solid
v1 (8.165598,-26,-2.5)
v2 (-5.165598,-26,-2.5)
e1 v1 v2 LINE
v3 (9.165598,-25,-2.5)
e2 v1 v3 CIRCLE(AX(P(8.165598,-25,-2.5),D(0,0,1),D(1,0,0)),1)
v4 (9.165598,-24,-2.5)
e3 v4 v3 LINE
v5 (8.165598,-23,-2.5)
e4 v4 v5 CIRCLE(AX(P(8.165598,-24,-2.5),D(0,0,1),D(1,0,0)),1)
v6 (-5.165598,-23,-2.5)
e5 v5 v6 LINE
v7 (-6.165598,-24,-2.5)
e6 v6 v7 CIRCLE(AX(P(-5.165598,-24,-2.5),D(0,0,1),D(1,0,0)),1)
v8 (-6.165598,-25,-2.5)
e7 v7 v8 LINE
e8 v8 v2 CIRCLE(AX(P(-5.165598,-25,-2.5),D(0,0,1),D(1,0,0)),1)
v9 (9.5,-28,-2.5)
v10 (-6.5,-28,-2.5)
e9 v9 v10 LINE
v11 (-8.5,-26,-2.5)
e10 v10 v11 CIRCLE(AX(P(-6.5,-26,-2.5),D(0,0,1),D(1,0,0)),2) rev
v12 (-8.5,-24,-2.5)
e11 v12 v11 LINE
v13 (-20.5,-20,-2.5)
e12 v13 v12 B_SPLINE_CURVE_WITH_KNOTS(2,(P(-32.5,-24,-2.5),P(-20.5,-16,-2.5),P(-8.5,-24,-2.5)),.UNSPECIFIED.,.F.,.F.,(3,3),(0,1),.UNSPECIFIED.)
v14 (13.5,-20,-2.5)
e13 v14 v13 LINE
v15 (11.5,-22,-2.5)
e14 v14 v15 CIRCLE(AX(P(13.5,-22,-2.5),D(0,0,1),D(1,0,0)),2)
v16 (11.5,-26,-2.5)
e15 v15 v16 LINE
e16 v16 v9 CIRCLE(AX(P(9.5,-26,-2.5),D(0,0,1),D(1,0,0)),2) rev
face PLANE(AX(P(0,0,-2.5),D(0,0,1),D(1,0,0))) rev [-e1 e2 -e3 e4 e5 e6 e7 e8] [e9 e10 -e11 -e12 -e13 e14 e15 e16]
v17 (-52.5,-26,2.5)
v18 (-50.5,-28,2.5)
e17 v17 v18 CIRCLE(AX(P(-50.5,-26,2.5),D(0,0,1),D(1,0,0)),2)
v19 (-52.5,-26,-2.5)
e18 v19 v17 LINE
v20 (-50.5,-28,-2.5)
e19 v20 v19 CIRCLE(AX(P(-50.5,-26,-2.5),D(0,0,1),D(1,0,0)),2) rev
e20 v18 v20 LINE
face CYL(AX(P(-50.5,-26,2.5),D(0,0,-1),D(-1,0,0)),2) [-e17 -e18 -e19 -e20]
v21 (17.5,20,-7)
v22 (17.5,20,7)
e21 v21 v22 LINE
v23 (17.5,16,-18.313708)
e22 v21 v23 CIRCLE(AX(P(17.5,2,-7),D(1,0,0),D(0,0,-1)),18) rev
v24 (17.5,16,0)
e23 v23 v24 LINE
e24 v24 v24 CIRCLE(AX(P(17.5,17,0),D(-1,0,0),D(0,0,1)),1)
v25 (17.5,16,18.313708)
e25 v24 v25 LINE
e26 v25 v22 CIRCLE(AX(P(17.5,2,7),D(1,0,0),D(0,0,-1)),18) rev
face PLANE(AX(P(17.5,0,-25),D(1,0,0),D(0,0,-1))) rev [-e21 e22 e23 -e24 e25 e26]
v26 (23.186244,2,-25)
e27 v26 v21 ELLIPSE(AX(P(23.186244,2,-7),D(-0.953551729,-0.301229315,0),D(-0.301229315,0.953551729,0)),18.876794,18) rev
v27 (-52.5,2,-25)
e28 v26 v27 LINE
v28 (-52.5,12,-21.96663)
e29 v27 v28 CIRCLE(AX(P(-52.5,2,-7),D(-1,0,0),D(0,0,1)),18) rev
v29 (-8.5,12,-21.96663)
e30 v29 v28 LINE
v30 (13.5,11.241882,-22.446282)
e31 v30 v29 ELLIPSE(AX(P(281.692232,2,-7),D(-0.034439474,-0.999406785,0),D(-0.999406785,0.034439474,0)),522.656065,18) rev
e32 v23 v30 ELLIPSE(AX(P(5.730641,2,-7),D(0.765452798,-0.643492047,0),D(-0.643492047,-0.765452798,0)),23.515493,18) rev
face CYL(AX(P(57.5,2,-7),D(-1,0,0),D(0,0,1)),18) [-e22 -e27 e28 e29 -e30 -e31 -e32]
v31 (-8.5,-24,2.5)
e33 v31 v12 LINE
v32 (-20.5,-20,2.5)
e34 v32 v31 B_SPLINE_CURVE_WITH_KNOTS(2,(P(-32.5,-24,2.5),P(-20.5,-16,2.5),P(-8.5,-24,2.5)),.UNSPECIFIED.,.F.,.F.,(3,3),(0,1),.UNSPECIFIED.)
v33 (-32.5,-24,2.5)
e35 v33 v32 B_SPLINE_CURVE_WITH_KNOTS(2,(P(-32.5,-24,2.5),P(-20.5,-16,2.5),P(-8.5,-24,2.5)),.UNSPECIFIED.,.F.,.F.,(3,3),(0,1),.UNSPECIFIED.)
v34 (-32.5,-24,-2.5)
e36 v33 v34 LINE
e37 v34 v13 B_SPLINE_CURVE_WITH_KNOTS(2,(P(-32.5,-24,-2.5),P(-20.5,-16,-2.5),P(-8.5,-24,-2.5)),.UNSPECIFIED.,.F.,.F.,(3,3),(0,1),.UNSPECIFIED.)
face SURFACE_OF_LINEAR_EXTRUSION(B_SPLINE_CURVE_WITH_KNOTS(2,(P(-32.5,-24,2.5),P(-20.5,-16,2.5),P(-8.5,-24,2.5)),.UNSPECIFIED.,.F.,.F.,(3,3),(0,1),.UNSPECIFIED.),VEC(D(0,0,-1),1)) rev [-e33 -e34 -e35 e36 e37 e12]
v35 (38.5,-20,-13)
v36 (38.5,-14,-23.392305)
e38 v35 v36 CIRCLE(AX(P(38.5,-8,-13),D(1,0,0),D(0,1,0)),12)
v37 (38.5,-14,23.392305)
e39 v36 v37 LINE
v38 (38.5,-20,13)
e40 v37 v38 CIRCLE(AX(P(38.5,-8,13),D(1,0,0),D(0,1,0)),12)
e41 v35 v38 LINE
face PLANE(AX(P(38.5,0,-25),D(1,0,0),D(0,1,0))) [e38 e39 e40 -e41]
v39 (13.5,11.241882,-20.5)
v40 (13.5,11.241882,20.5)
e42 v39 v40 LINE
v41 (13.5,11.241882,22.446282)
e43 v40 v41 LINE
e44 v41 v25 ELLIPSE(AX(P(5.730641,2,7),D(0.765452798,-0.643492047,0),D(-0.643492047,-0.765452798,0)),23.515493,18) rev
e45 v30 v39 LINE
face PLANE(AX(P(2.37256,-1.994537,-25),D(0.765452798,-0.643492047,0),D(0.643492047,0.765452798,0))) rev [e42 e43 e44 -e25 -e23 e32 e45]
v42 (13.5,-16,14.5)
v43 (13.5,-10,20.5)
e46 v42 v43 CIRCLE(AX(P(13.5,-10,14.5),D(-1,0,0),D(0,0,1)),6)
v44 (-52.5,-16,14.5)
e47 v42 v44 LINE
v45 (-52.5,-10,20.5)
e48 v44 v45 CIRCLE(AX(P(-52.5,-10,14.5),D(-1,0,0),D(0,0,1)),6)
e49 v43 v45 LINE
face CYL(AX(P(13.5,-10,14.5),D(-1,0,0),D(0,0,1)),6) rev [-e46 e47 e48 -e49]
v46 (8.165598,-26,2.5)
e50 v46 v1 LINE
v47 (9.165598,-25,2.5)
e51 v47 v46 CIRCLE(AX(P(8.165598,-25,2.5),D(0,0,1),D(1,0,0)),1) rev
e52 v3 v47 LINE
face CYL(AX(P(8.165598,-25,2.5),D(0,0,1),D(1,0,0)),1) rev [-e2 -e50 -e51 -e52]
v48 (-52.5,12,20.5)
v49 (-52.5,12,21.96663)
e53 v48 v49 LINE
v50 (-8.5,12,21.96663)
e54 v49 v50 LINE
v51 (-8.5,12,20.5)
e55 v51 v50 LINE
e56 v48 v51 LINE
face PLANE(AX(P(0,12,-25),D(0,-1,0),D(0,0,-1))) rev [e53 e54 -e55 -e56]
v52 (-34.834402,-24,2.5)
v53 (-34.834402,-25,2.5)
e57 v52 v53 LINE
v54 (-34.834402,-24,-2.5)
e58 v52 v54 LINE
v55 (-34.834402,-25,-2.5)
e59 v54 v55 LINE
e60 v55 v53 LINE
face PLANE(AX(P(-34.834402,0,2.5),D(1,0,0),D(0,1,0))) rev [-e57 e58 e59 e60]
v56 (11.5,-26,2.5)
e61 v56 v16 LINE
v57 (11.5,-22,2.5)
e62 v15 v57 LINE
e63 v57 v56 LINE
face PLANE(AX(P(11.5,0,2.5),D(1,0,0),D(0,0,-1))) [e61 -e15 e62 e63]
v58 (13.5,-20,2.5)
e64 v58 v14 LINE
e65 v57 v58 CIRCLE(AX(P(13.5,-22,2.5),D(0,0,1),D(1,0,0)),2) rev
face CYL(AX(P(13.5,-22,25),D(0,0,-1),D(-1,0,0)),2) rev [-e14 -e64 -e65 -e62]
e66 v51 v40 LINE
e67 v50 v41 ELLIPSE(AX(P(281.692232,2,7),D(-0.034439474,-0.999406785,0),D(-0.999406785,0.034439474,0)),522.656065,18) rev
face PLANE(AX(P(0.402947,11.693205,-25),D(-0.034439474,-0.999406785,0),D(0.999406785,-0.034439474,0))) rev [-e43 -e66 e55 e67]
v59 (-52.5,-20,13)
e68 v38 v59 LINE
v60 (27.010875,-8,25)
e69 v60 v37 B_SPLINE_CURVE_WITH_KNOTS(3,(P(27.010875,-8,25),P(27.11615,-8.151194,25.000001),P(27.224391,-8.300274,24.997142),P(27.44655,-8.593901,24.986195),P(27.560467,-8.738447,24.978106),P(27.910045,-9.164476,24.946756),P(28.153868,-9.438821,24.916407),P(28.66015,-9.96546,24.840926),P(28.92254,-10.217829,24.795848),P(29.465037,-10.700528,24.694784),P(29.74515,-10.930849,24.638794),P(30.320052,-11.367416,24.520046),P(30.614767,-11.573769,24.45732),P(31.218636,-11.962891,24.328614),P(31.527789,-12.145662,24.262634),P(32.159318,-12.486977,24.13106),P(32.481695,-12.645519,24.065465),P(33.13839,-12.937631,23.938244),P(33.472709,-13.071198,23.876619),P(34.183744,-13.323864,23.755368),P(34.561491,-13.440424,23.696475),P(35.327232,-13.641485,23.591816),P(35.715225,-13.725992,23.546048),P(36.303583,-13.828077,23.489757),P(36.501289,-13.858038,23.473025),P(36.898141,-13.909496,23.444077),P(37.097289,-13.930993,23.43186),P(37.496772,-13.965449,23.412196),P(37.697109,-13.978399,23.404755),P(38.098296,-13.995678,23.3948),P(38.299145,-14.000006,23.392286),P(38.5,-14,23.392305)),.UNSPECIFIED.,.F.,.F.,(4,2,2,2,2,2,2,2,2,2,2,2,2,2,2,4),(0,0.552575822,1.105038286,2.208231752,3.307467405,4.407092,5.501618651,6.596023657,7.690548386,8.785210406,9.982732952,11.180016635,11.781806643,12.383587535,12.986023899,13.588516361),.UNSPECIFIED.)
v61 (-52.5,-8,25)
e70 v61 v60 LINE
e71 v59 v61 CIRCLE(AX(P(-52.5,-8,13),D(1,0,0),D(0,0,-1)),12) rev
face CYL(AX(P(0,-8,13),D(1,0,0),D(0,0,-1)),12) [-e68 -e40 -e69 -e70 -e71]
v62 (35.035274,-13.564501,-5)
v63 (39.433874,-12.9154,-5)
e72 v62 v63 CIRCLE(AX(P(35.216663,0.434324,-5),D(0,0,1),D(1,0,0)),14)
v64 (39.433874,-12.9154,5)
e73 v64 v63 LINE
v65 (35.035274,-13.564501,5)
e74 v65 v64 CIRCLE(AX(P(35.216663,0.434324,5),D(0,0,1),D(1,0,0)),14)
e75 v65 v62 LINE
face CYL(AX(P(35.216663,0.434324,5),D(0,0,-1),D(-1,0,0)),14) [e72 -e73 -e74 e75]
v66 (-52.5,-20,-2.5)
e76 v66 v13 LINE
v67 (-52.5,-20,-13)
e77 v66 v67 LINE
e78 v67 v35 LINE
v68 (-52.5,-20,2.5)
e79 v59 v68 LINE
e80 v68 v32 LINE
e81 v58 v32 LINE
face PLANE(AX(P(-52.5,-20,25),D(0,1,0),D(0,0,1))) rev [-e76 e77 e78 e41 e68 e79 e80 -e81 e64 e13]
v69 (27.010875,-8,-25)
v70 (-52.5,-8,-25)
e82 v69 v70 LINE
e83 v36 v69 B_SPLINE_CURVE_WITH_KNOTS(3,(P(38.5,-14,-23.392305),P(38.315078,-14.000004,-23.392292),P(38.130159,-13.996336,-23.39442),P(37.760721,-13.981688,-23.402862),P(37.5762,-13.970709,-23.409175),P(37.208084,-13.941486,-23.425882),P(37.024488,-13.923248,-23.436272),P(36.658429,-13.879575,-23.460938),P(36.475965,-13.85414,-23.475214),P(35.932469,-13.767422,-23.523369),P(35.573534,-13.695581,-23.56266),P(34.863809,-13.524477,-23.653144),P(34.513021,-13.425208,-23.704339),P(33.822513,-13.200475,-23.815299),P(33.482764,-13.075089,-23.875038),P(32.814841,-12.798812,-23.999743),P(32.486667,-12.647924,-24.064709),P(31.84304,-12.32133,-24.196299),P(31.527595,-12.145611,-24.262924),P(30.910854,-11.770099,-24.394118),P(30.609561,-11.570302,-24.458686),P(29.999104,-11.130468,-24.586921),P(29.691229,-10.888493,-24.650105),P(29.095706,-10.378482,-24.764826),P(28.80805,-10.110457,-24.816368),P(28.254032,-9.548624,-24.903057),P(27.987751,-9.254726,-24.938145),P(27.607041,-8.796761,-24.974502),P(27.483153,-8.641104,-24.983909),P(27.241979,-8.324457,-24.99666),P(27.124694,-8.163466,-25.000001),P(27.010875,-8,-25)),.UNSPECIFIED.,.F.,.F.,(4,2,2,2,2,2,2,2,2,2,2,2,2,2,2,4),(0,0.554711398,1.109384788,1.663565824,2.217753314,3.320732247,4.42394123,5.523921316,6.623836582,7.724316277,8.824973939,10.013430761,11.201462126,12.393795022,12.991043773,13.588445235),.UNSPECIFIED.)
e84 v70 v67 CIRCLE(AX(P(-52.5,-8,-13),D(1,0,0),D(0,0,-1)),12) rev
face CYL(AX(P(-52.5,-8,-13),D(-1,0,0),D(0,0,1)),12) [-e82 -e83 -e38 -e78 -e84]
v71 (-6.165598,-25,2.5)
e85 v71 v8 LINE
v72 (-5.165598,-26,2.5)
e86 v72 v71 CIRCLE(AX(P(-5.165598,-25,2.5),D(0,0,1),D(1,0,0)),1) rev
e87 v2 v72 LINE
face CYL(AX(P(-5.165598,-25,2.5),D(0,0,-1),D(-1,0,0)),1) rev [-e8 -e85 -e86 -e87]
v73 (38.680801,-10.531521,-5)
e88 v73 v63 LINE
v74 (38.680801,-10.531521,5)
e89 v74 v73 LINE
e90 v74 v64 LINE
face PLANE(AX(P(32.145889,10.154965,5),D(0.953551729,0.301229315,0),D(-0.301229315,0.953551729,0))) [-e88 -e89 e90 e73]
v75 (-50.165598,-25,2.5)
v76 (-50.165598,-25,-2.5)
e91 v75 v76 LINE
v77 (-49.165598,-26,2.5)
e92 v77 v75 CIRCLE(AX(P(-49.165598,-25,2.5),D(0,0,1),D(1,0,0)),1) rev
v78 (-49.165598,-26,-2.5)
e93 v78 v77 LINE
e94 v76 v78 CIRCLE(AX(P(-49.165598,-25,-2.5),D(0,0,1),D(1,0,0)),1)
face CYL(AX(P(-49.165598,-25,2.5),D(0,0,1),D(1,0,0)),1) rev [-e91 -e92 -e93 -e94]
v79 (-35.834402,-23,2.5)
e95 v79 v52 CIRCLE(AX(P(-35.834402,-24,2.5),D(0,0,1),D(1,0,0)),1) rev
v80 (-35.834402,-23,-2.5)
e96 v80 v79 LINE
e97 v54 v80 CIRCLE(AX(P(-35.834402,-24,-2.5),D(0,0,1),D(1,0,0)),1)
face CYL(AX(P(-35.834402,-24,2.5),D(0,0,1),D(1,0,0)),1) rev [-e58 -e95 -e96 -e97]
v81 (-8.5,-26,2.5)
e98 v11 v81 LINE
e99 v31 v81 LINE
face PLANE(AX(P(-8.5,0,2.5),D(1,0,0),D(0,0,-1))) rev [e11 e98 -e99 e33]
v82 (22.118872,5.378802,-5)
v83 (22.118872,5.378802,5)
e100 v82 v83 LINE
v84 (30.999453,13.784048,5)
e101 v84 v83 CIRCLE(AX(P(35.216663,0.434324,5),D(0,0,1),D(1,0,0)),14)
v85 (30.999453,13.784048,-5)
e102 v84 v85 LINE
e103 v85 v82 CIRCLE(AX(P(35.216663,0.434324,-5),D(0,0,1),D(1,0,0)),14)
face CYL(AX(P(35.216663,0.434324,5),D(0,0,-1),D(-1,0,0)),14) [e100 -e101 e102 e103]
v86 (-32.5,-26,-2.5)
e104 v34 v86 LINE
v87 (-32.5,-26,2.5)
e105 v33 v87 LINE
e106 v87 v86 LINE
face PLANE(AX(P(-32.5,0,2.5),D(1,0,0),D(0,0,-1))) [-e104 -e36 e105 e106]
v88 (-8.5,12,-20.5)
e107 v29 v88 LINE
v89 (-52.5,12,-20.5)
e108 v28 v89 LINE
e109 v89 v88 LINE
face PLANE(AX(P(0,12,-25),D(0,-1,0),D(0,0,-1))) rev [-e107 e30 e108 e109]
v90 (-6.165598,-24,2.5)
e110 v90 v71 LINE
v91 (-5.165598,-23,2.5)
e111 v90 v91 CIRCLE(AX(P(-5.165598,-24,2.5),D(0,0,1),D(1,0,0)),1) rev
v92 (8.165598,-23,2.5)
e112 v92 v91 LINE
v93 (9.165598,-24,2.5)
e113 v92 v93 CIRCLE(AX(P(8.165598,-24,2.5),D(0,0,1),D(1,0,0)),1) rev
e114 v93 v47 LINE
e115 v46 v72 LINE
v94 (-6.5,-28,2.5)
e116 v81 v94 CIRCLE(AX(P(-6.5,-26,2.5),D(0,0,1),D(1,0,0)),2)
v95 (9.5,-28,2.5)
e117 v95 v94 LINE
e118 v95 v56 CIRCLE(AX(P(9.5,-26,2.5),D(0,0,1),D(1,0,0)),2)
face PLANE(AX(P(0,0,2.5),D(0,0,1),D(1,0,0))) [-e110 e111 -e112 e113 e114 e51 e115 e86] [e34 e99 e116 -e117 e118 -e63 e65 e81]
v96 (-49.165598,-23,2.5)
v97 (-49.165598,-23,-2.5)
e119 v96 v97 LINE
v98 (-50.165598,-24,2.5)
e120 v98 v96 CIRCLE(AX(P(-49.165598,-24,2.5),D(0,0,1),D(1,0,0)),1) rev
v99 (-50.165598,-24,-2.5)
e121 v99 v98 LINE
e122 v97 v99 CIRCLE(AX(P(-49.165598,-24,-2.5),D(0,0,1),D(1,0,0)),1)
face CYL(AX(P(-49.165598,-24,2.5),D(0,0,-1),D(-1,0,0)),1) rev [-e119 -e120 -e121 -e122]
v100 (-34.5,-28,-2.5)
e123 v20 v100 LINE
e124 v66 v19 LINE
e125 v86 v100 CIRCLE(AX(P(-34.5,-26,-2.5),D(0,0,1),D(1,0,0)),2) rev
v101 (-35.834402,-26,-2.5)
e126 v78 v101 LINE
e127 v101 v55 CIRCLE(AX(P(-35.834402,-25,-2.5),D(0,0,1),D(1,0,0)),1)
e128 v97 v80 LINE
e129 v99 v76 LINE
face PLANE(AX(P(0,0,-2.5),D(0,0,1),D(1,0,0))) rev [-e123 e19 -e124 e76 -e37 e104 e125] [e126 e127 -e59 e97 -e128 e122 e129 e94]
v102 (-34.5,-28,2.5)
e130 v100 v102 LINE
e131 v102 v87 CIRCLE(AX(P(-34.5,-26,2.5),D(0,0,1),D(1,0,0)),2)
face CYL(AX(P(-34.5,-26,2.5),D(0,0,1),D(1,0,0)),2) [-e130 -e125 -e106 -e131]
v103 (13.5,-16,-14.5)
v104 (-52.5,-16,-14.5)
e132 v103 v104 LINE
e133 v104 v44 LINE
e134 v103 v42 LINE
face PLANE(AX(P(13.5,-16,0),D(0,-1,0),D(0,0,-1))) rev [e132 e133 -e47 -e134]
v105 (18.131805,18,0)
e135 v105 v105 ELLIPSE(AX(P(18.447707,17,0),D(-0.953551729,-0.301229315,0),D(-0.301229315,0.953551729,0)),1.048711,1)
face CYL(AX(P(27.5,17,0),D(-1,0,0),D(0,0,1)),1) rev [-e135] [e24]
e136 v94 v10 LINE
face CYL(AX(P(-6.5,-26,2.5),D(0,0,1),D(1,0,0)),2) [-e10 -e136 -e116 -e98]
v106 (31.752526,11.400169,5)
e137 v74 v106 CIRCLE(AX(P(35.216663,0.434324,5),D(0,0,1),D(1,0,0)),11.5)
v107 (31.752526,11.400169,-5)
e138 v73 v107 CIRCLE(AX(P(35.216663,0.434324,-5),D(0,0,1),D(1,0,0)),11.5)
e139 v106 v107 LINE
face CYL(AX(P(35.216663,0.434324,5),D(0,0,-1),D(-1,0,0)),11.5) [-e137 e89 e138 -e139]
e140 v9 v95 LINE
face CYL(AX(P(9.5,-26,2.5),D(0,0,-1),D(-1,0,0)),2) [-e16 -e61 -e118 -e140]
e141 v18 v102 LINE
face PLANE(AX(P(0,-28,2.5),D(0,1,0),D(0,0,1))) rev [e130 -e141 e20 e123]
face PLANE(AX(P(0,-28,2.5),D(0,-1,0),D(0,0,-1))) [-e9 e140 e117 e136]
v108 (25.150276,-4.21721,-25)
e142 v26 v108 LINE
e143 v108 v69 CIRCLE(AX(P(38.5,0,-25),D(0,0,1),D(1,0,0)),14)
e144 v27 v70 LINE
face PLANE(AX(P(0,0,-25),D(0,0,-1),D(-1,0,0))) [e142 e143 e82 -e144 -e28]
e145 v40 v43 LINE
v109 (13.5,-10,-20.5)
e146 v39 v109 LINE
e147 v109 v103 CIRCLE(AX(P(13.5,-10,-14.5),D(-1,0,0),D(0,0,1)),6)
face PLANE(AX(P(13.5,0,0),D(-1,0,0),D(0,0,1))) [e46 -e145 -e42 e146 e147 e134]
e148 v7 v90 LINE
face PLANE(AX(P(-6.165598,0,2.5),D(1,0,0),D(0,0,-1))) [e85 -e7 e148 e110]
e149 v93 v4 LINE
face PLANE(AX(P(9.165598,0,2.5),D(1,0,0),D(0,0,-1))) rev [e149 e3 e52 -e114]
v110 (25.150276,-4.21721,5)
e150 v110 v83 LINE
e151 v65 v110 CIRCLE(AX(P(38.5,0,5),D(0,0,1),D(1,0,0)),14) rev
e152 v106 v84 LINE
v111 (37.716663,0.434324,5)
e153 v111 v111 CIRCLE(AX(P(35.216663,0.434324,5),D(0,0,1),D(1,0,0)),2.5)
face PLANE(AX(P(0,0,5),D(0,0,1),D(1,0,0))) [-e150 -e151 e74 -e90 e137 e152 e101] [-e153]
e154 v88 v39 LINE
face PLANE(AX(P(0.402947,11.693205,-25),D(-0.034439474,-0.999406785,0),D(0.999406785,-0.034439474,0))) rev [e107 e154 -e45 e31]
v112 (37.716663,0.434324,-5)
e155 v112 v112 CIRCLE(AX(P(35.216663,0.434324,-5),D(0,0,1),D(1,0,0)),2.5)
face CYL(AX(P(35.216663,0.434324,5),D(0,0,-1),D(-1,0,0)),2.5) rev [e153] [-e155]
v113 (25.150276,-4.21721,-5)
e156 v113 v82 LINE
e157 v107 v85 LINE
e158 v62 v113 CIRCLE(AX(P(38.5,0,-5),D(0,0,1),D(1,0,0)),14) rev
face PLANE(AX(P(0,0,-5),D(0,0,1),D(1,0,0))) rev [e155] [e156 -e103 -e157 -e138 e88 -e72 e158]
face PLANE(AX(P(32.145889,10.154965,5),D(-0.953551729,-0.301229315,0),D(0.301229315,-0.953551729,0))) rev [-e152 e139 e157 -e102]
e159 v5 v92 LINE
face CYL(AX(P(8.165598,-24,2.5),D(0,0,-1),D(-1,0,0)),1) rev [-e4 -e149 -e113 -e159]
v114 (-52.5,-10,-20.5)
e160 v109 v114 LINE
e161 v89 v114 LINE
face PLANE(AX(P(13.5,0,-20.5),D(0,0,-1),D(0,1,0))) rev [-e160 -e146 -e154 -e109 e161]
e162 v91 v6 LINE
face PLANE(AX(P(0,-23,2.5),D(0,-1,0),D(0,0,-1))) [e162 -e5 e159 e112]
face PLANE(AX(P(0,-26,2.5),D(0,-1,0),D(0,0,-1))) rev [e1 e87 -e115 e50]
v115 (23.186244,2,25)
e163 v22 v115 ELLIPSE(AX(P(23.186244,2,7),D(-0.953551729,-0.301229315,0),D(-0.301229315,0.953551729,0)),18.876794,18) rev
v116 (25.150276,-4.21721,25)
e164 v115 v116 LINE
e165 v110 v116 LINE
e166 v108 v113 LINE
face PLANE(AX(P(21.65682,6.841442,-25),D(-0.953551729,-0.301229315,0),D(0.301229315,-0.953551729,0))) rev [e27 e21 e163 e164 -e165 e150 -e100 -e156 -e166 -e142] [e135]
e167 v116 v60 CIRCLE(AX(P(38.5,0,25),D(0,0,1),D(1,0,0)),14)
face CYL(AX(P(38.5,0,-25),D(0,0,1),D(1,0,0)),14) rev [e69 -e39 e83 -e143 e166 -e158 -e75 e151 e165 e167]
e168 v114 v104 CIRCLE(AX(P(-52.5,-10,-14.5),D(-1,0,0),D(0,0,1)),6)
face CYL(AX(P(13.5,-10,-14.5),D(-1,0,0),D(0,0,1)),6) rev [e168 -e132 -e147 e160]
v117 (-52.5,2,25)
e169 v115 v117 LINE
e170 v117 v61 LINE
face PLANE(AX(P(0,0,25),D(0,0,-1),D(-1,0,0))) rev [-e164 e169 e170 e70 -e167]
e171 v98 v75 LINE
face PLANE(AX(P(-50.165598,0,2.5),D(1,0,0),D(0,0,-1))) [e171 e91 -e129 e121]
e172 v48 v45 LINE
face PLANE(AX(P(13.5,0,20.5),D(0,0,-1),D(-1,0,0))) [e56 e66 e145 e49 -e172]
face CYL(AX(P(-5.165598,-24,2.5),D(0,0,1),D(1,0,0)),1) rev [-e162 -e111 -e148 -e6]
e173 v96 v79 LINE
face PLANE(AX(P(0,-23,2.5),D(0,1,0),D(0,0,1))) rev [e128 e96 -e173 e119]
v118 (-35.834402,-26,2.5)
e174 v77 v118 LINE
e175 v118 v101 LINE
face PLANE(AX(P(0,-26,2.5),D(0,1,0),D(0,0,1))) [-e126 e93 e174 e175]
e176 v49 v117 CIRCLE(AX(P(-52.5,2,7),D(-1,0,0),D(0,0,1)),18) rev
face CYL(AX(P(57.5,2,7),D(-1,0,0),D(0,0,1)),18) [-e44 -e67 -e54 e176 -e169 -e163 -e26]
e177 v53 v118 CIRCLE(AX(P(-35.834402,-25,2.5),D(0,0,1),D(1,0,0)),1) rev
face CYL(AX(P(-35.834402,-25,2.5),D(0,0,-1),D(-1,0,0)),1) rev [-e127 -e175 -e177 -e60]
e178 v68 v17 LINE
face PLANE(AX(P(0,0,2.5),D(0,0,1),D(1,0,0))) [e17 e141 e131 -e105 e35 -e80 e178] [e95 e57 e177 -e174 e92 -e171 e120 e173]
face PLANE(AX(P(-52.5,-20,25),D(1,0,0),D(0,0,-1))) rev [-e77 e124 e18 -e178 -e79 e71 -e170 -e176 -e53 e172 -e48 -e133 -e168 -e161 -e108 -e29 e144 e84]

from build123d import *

# Parameters (mm, degrees)
CROQUIS1_W              = 105
CROQUIS1_H              = 40
SALIENTE_EXTRUIR1_DEPTH = 25
CORTAR_EXTRUIR1_DEPTH   = 50
CORTAR_EXTRUIR2_DEPTH   = 50
CROQUIS6_R              = 2.5
SALIENTE_EXTRUIR3_DEPTH = 5
CORTAR_EXTRUIR3_DEPTH   = 76.208044782
REDONDEO2_R             = 12
CORTAR_EXTRUIR4_DEPTH   = 110
CORTAR_EXTRUIR5_DEPTH   = 66
CROQUIS12_W             = 20
CROQUIS12_H             = 8
CROQUIS12_W_2           = 15.331196302
CROQUIS12_H_2           = 3
SALIENTE_EXTRUIR4_DEPTH = 2.5
CROQUIS13_R             = 1
CORTAR_EXTRUIR6_DEPTH   = 10
REDONDEO3_R             = 2
REDONDEO4_R             = 2
REDONDEO5_R             = 1


with BuildPart() as part:
    # Croquis1 → Saliente-Extruir1 (new, symmetric)
    with BuildSketch(Plane.XY):
        Rectangle(CROQUIS1_W, CROQUIS1_H)
    extrude(amount=SALIENTE_EXTRUIR1_DEPTH, both=True)

    # Croquis2 → Cortar-Extruir1 (cut)
    with BuildSketch(Plane.XY.offset(25)):
        Polygon((-52.5, 20), (-52.5, 12), (-46.5, 12), (-26.5, 12), (-8.5, 12), (13.5, 11.241881844), (17.5, 16), (17.5, 20), align=None)
    extrude(amount=-CORTAR_EXTRUIR1_DEPTH, mode=Mode.SUBTRACT)

    # Croquis5 → Cortar-Extruir2 (cut)
    with BuildSketch(Plane.XY.offset(25)):
        with BuildLine():
            Line((52.5, 20), (17.5, 20))
            Line((17.5, 20), (25.150275796, -4.217210414))
            ThreePointArc((25.150275796, -4.217210414), (40.633525386, -13.836476048), (52.5, 0))
            Line((52.5, 0), (52.5, 20))
        make_face()
    extrude(amount=-CORTAR_EXTRUIR2_DEPTH, mode=Mode.SUBTRACT)

    # Croquis6 → Saliente-Extruir3 (add, symmetric)
    with BuildSketch(Plane.XY):
        with BuildLine():
            Line((39.433873902, -12.915399918), (38.680800614, -10.531520596))
            ThreePointArc((38.680800614, -10.531520596), (46.18250837, 3.898461412), (31.752526362, 11.400169168))
            Line((31.752526362, 11.400169168), (30.999453074, 13.78404849))
            ThreePointArc((30.999453074, 13.78404849), (21.866939284, -3.782886128), (39.433873902, -12.915399918))
        make_face()
        with Locations((35.216663488, 0.434324286)):
            Circle(CROQUIS6_R, mode=Mode.SUBTRACT)
    extrude(amount=SALIENTE_EXTRUIR3_DEPTH, both=True)

    # Croquis8 → Cortar-Extruir3 (cut, through all)
    with BuildSketch(Plane.XY.offset(25)):
        with BuildLine():
            Line((38.5, -14), (38.5, -20))
            Line((38.5, -20), (52.5, -20))
            Line((52.5, -20), (52.5, 0))
            ThreePointArc((52.5, 0), (48.399494937, -9.899494937), (38.5, -14))
        make_face()
    extrude(amount=-CORTAR_EXTRUIR3_DEPTH, mode=Mode.SUBTRACT)

    # Redondeo2
    redondeo2_edges = [part.edges().sort_by_distance(p)[0] for p in [
        (-7, -20, -25),
        (-7, -20, 25),
    ]]
    fillet(redondeo2_edges, radius=REDONDEO2_R)

    # Croquis10 → Cortar-Extruir4 (cut)
    with BuildSketch(Plane.ZY.offset(52.5)):
        with BuildLine():
            Line((25, 32), (-25, 32))
            Line((-25, 32), (-25, 2))
            ThreePointArc((-25, 2), (-19.727922061, 14.727922061), (-7, 20))
            Line((-7, 20), (7, 20))
            ThreePointArc((7, 20), (19.727922061, 14.727922061), (25, 2))
            Line((25, 2), (25, 32))
        make_face()
    extrude(amount=-CORTAR_EXTRUIR4_DEPTH, mode=Mode.SUBTRACT)

    # Croquis11 → Cortar-Extruir5 (cut)
    with BuildSketch(Plane.ZY.offset(52.5)):
        with BuildLine():
            Line((20.5, 23.772379217), (-20.5, 23.772379217))
            Line((-20.5, 23.772379217), (-20.5, -10))
            ThreePointArc((-20.5, -10), (-18.742640687, -14.242640687), (-14.5, -16))
            Line((-14.5, -16), (14.5, -16))
            ThreePointArc((14.5, -16), (18.742640687, -14.242640687), (20.5, -10))
            Line((20.5, -10), (20.5, 23.772379217))
        make_face()
    extrude(amount=-CORTAR_EXTRUIR5_DEPTH, mode=Mode.SUBTRACT)

    # Croquis12 → Saliente-Extruir4 (add, symmetric)
    # profile 1 of 4: a face of its own
    with BuildSketch(Plane.XY):
        with Locations((-42.5, -24)):
            Rectangle(CROQUIS12_W, CROQUIS12_H)
        with Locations((-42.5, -24.5)):
            Rectangle(CROQUIS12_W_2, CROQUIS12_H_2, mode=Mode.SUBTRACT)
    # profile 2 of 4: a face of its own
    with BuildSketch(Plane.XY):
        Polygon((11.5, -20), (-8.5, -20), (-8.5, -24), (-8.5, -28), (11.5, -28), align=None)
        with Locations((1.5, -24.5)):
            Rectangle(CROQUIS12_W_2, CROQUIS12_H_2, mode=Mode.SUBTRACT)
    # profile 3 of 4: a face of its own
    with BuildSketch(Plane.XY):
        with BuildLine():
            Line((-32.5, -20), (-32.5, -24))
            add(Edge.make_bspline(
                [(-32.5, -24), (-26.5, -20), (-20.5, -20)],
                knots=[0, 0, 0, 0.5, 0.5, 0.5], degree=2))
            Line((-20.5, -20), (-32.5, -20))
        make_face()
    # profile 4 of 4: a face of its own
    with BuildSketch(Plane.XY):
        with BuildLine():
            Line((-8.5, -20), (-20.5, -20))
            add(Edge.make_bspline(
                [(-20.5, -20), (-14.5, -20), (-8.5, -24)],
                knots=[0.5, 0.5, 0.5, 1, 1, 1], degree=2))
            Line((-8.5, -24), (-8.5, -20))
        make_face()
    extrude(amount=SALIENTE_EXTRUIR4_DEPTH, both=True)

    # Croquis13 → Cortar-Extruir6 (cut)
    with BuildSketch(Plane.ZY.offset(-17.5)):
        with Locations((0, 17)):
            Circle(CROQUIS13_R)
    extrude(amount=-CORTAR_EXTRUIR6_DEPTH, mode=Mode.SUBTRACT)

    # Redondeo3
    redondeo3_edges = [part.edges().sort_by_distance(p)[0] for p in [
        (-8.5, -28, 0),
        (-52.5, -28, 0),
        (-32.5, -28, 0),
        (11.5, -28, 0),
    ]]
    fillet(redondeo3_edges, radius=REDONDEO3_R)

    # Redondeo4
    redondeo4_edges = [part.edges().sort_by_distance(p)[0] for p in [
        (11.5, -20, 0),
    ]]
    fillet(redondeo4_edges, radius=REDONDEO4_R)

    # Redondeo5
    redondeo5_edges = [part.edges().sort_by_distance(p)[0] for p in [
        (-34.834401849, -26, 0),
        (-50.165598151, -26, 0),
        (-50.165598151, -23, 0),
        (-34.834401849, -23, 0),
        (-6.165598151, -26, 0),
        (-6.165598151, -23, 0),
        (9.165598151, -26, 0),
        (9.165598151, -23, 0),
    ]]
    fillet(redondeo5_edges, radius=REDONDEO5_R)


solid = part.part
